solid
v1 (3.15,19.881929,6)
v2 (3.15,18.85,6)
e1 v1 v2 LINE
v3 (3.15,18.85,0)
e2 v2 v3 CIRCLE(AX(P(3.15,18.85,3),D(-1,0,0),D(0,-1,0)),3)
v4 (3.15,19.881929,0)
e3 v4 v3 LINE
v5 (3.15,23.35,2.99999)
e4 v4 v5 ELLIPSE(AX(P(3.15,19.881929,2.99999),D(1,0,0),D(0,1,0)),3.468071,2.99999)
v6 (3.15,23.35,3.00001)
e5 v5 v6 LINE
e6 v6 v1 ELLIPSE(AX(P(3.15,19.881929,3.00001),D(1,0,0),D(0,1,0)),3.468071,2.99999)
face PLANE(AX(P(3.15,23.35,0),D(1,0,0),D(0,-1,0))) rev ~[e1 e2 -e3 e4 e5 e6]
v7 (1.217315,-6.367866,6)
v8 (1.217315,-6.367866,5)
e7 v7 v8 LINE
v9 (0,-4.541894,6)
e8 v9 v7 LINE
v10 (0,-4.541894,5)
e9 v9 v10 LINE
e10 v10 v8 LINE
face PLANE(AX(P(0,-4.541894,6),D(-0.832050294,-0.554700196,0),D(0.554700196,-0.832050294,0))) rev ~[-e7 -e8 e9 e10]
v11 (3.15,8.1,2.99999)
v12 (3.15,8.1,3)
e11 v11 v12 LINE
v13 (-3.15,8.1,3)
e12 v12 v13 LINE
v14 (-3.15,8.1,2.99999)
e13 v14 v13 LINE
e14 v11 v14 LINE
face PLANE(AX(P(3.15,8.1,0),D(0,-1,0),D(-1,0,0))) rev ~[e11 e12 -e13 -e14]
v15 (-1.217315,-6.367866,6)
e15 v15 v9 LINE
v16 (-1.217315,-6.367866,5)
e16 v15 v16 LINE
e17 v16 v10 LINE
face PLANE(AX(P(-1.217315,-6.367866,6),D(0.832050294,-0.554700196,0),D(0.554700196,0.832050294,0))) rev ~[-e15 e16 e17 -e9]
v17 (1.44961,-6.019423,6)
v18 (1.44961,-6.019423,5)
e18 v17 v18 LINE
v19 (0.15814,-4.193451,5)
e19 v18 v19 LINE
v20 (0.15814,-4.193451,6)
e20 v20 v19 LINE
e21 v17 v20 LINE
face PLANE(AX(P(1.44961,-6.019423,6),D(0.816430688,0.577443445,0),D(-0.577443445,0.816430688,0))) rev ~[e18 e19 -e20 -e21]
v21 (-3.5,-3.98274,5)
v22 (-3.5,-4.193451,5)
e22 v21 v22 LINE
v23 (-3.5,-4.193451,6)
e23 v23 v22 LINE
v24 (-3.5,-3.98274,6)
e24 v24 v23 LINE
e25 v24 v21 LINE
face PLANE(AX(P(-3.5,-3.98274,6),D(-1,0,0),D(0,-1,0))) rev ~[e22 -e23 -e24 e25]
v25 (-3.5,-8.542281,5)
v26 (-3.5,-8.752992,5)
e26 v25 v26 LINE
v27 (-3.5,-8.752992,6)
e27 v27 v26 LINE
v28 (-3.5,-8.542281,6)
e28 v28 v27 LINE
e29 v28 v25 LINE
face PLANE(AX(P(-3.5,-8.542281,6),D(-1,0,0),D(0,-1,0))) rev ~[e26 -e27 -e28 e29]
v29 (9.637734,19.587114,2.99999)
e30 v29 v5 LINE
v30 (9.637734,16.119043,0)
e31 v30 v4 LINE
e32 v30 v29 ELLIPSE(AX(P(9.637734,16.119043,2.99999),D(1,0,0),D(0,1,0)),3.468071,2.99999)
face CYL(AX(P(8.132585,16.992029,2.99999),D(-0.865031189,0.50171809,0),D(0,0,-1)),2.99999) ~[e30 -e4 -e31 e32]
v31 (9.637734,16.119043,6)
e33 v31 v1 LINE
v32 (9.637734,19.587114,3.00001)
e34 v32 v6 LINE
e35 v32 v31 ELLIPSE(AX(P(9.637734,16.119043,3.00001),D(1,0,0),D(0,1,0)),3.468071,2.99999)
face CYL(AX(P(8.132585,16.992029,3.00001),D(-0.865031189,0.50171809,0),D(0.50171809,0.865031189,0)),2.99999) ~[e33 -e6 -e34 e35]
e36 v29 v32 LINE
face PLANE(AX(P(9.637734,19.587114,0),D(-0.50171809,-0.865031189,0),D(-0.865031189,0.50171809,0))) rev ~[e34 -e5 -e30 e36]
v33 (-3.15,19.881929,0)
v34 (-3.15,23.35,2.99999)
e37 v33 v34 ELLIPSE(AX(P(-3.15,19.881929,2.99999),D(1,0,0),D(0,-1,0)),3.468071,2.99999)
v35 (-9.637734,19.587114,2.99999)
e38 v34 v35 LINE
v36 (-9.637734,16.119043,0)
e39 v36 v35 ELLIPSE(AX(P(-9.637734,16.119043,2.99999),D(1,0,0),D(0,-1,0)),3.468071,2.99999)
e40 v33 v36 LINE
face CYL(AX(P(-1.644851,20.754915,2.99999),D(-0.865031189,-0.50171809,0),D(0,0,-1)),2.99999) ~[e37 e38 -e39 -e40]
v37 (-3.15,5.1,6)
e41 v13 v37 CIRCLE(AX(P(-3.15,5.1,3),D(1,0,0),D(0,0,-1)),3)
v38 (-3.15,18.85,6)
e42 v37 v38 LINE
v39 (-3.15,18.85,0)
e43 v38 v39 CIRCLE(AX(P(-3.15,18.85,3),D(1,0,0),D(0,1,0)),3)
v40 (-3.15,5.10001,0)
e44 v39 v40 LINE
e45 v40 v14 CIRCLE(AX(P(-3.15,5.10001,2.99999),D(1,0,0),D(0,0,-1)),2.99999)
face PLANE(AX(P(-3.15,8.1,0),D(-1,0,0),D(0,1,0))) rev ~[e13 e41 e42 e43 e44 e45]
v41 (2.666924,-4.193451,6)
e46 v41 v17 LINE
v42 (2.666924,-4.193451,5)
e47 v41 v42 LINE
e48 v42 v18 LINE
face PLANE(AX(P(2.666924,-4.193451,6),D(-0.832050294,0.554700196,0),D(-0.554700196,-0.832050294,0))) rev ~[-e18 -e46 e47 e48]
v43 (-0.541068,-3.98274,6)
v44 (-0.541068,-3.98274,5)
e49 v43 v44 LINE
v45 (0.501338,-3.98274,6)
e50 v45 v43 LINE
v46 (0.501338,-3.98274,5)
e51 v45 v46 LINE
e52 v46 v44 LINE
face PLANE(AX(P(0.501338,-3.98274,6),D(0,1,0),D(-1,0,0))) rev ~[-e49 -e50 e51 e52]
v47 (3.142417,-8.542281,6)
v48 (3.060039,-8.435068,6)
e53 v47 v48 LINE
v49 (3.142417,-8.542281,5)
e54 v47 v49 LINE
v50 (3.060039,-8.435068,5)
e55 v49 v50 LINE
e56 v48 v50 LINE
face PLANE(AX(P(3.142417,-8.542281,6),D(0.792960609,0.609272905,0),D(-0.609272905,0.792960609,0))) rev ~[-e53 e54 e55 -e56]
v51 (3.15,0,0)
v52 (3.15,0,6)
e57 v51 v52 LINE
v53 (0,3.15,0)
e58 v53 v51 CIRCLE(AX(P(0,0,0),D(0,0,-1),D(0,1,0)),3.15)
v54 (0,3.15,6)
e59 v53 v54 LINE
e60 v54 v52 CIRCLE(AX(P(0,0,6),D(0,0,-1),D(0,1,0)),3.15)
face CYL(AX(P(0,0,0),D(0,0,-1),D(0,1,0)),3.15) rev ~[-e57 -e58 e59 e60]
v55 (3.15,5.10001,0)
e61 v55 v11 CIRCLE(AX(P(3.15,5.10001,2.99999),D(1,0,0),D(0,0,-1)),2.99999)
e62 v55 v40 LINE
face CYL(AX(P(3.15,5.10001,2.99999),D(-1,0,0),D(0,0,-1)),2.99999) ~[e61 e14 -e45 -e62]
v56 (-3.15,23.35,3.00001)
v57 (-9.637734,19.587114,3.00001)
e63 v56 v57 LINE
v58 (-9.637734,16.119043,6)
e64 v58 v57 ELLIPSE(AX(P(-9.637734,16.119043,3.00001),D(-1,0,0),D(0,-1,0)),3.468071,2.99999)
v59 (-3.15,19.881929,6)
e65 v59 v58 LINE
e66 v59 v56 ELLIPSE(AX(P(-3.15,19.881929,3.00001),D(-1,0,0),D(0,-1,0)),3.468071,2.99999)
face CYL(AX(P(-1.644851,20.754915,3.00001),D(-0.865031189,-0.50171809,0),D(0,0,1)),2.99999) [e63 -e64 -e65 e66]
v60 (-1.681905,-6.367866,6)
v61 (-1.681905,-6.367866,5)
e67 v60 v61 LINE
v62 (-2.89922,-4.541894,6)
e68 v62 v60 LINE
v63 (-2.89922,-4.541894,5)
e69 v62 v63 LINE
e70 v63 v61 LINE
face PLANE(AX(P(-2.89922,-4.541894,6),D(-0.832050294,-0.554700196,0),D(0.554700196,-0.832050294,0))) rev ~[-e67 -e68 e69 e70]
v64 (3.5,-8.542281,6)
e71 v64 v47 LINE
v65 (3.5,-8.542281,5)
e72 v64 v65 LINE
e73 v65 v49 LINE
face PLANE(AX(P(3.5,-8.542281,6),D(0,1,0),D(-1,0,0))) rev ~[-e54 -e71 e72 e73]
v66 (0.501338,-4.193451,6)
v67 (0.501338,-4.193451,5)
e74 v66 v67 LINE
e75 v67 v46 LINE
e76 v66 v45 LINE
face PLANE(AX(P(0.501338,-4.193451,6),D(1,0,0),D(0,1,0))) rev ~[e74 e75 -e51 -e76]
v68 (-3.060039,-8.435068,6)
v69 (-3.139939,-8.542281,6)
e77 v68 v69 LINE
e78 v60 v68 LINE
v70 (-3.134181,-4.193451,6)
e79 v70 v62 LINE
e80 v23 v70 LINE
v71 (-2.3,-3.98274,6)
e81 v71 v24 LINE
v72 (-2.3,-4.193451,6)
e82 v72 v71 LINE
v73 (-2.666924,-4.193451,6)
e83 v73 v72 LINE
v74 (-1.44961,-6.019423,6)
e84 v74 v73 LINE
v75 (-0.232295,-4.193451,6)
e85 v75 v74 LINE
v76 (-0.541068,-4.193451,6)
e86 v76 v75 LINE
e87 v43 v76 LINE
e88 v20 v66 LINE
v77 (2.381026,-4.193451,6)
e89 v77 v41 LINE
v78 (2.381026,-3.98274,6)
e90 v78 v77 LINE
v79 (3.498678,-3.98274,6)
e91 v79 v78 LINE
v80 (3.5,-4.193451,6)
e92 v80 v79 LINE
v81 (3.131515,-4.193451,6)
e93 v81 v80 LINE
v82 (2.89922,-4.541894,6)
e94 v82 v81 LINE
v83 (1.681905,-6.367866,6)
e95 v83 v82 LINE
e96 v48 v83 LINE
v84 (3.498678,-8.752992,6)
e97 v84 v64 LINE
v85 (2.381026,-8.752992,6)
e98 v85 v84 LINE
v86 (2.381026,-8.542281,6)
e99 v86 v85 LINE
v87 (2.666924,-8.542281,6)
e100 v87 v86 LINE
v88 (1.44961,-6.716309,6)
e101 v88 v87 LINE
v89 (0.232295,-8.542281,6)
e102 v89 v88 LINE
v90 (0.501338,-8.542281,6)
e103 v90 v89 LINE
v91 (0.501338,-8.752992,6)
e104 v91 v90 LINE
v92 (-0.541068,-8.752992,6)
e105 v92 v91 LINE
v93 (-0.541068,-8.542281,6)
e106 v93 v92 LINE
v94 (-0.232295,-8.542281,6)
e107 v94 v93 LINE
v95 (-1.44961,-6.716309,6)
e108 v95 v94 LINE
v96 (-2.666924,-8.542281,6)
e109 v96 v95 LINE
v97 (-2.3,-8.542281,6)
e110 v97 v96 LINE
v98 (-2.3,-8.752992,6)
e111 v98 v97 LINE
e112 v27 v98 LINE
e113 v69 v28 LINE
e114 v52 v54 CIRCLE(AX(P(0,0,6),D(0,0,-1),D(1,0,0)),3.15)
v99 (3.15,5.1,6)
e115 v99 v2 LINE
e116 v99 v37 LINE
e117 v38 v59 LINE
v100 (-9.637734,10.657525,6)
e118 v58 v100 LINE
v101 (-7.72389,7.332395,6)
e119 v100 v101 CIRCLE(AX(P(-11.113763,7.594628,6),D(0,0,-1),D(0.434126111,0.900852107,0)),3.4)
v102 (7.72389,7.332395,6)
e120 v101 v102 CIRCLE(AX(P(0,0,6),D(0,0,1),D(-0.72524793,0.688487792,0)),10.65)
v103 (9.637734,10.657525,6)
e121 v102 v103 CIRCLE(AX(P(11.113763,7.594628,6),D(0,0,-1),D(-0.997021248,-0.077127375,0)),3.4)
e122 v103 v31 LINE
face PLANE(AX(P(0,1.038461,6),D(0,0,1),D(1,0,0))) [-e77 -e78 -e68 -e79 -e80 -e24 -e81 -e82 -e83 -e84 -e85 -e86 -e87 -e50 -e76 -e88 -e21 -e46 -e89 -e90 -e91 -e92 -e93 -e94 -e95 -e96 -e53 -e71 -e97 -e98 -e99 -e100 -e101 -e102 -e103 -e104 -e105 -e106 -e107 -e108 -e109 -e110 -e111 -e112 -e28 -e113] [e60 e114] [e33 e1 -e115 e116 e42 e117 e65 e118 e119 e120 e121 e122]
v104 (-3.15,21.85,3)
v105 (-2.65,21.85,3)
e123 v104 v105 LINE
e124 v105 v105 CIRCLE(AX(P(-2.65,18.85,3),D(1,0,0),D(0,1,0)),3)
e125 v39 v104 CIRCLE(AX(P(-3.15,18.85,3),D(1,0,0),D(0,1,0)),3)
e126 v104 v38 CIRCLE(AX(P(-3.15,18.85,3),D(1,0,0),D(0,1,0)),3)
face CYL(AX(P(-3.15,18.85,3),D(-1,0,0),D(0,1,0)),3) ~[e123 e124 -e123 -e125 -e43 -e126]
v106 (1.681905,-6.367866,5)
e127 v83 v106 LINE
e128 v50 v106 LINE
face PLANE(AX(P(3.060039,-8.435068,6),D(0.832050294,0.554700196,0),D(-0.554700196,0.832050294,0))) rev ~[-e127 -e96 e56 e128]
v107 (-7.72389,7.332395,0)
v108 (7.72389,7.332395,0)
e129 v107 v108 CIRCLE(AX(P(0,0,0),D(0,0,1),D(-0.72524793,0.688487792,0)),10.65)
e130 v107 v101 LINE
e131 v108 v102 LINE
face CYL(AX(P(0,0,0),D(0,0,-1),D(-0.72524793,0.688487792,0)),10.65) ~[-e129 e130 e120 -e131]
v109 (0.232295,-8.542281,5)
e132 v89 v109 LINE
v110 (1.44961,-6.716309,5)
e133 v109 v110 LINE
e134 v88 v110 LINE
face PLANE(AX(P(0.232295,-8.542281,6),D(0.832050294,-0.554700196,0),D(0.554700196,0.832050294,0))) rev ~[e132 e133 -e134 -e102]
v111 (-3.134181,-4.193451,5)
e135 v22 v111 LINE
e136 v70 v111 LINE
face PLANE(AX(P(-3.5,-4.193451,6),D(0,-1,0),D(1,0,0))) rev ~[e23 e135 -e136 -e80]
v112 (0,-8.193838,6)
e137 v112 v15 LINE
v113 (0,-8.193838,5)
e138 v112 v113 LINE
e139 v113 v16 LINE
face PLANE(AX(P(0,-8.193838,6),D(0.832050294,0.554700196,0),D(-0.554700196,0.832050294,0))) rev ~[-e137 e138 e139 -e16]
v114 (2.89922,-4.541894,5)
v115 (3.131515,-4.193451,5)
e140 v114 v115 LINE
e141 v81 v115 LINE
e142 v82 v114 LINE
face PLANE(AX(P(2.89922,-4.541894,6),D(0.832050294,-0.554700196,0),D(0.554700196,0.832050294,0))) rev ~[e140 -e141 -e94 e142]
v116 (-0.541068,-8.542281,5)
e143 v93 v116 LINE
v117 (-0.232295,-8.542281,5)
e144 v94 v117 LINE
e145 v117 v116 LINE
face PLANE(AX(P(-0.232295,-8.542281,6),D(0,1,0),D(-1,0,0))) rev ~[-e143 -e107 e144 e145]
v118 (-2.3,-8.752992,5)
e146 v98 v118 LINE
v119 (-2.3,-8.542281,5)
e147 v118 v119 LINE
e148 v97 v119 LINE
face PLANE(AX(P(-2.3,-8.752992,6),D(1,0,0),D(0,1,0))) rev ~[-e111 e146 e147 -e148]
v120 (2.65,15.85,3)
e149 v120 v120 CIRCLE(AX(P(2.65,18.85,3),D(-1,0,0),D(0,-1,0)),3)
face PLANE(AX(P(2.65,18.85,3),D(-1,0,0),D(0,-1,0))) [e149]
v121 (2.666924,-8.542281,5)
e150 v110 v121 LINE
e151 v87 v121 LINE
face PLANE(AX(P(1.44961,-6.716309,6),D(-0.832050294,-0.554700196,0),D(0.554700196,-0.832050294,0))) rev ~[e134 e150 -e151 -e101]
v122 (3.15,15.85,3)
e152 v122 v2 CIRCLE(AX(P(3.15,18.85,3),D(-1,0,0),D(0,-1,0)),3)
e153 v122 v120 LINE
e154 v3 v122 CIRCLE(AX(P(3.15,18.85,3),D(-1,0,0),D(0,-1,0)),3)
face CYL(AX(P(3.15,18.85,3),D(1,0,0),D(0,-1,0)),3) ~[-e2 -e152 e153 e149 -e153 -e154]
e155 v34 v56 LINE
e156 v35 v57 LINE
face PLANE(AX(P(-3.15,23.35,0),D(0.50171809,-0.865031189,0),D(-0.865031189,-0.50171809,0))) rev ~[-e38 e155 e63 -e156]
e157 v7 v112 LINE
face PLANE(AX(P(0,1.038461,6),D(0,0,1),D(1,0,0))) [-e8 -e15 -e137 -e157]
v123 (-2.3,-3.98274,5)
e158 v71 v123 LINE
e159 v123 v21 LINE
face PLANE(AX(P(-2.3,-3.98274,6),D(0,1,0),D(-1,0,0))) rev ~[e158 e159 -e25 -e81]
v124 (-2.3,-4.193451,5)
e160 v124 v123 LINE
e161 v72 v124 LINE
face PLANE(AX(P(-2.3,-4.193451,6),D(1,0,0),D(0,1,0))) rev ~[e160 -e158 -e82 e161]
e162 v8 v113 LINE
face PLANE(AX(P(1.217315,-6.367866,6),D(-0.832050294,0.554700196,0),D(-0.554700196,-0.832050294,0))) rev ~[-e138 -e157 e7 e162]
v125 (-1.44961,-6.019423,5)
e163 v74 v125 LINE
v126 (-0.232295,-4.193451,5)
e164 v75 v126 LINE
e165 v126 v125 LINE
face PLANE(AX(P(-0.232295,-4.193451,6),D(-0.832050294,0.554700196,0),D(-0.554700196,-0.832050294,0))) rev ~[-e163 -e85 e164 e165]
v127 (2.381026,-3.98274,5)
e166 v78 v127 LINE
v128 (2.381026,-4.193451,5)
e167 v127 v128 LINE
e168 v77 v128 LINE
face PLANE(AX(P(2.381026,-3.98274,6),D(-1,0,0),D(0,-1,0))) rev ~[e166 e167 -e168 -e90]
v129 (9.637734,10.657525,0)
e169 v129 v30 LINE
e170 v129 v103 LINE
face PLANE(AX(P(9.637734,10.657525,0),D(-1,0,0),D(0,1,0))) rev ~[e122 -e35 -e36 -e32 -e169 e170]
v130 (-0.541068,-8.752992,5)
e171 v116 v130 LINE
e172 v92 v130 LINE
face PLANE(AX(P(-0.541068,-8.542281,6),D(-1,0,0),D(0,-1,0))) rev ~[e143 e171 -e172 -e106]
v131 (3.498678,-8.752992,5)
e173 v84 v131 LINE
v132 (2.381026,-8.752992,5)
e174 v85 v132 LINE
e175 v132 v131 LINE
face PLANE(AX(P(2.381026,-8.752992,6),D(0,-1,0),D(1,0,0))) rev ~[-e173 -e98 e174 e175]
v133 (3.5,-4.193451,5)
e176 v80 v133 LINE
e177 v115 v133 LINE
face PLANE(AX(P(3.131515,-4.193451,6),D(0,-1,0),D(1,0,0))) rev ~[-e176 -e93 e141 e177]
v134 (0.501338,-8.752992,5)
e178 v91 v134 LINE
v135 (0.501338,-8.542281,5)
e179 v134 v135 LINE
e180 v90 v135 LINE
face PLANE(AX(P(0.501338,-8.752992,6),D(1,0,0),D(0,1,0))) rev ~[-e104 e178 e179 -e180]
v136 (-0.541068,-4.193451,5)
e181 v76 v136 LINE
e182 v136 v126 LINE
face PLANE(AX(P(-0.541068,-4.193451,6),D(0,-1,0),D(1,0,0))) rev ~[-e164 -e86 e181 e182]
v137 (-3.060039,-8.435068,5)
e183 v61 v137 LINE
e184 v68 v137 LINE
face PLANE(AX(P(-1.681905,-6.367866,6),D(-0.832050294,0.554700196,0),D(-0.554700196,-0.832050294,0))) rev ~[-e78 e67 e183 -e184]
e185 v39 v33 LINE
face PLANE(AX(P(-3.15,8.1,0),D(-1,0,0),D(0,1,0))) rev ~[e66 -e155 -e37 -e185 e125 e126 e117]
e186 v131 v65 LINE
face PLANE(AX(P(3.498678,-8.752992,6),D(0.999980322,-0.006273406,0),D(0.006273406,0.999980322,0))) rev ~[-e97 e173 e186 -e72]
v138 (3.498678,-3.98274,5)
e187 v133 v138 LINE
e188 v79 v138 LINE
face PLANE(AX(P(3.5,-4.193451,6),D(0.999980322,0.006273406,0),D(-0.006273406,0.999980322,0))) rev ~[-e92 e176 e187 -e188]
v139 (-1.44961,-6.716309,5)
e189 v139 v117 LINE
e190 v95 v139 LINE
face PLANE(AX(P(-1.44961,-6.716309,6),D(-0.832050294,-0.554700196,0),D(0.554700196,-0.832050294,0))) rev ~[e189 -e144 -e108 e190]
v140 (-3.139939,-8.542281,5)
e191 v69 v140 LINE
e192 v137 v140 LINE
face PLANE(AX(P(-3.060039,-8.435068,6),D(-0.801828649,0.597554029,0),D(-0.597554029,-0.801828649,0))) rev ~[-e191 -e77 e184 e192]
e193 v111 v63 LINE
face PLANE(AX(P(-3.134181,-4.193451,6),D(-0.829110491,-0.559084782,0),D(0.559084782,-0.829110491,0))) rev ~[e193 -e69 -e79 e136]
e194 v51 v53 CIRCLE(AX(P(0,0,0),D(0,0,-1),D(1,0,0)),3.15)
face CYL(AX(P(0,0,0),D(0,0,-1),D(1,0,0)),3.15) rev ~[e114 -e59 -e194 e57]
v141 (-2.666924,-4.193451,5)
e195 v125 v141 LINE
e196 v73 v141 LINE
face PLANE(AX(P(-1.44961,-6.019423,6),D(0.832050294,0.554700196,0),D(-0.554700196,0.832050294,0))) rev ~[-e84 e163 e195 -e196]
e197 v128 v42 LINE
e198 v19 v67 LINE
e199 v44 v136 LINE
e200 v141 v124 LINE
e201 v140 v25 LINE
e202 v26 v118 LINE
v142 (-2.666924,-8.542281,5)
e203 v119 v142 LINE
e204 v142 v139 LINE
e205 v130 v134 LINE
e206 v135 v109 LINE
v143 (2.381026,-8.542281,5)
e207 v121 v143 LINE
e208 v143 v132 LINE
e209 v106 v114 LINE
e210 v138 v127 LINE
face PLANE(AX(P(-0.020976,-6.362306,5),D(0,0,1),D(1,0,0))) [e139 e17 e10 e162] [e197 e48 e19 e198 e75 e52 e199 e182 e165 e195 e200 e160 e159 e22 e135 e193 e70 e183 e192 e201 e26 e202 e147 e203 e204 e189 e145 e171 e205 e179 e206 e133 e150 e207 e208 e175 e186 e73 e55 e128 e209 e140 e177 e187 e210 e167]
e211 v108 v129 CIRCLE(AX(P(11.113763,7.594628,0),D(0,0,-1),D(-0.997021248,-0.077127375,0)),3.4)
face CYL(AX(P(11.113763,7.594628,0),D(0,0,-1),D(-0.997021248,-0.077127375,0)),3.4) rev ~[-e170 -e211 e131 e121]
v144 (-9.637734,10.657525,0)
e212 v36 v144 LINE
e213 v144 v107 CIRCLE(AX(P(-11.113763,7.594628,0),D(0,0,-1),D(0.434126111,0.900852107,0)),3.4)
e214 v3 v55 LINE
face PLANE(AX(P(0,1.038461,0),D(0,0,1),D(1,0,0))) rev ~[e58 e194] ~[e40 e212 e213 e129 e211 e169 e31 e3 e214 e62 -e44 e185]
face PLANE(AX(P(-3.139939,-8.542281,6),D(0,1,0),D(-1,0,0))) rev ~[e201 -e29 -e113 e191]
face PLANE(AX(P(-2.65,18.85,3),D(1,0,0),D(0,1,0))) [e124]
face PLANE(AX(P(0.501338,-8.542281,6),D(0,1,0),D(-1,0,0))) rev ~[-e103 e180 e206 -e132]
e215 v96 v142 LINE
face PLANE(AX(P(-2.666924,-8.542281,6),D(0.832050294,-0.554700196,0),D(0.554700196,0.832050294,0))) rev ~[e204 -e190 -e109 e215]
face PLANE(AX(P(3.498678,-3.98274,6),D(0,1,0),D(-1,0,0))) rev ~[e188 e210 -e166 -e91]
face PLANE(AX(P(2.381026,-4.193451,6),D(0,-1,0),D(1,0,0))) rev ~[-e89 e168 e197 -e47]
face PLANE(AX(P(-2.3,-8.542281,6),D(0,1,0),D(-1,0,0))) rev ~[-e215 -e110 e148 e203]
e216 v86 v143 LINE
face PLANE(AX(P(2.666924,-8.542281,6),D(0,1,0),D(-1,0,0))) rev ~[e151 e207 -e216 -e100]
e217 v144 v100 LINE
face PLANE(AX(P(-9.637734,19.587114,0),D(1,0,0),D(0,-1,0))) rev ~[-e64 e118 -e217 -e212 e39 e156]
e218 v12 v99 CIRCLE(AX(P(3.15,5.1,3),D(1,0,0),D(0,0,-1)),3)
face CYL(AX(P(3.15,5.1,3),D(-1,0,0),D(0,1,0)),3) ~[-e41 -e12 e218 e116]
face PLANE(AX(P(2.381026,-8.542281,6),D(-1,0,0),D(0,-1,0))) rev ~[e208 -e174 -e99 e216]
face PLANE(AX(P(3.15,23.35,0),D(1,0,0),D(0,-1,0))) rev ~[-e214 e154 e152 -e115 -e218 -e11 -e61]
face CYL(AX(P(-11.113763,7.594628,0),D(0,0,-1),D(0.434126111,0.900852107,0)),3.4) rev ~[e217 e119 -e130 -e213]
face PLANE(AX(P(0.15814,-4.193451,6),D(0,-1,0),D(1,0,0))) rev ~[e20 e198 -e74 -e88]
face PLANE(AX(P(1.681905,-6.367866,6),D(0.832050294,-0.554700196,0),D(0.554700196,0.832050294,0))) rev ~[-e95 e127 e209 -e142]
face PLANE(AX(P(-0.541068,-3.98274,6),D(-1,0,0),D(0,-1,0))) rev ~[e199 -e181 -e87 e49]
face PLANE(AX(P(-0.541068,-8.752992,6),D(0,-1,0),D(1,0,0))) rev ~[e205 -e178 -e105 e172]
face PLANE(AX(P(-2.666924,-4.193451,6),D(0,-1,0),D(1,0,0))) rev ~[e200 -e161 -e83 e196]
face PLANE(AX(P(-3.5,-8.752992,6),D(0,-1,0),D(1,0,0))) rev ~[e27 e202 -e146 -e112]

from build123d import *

# Parameters (mm, degrees)
F1_DEPTH = 6
F2_R     = 3
F3_DEPTH = 0.5
F4_R     = 3
F5_DEPTH = 0.5
F6_R     = 2.99999
F7_R     = 2.99999
F9_DEPTH = 1
F10_R    = 3
F11_R    = 2.99999


# Not quite as in the source:
# - a fillet or chamfer is up to 0.001 mm smaller than in the source, because OpenCascade refuses the exact size


with BuildPart() as f1:
    # F0 (on Top) → F1 (new body)
    with BuildSketch(Plane.XY):
        with BuildLine():
            Line((-3.15, 8.1), (-3.15, 10.1734949747))
            ThreePointArc((-3.15, 10.1734949747), (-5.6194604457, 9.046776459), (-7.7238904562, 7.3323949854))
            ThreePointArc((-7.7238904562, 7.3323949854), (0, -10.65), (7.7238904562, 7.3323949854))
            ThreePointArc((7.7238904562, 7.3323949854), (5.6194604457, 9.046776459), (3.15, 10.1734949747))
            Line((3.15, 10.1734949747), (3.15, 8.1))
            Line((3.15, 8.1), (0, 8.1))
            Line((0, 8.1), (-3.15, 8.1))
        make_face()
        with BuildLine():
            ThreePointArc((3.15, 0), (-2.2273863607, -2.2273863607), (0, 3.15))
            ThreePointArc((0, 3.15), (2.2273863607, 2.2273863607), (3.15, 0))
        make_face(mode=Mode.SUBTRACT)
        with BuildLine():
            ThreePointArc((-7.7238904562, 7.3323949854), (-5.6194604457, 9.046776459), (-3.15, 10.1734949747))
            Line((-3.15, 10.1734949747), (-3.15, 23.35))
            Line((-3.15, 23.35), (-9.6377339195, 19.5871143267))
            Line((-9.6377339195, 19.5871143267), (-9.6377339195, 10.6575252249))
            ThreePointArc((-9.6377339195, 10.6575252249), (-8.1670066914, 9.2906908645), (-7.7238904562, 7.3323949854))
        make_face()
        with BuildLine():
            ThreePointArc((3.15, 10.1734949747), (5.6194604457, 9.046776459), (7.7238904562, 7.3323949854))
            ThreePointArc((7.7238904562, 7.3323949854), (8.1670066914, 9.2906908645), (9.6377339195, 10.6575252249))
            Line((9.6377339195, 10.6575252249), (9.6377339195, 19.5871143267))
            Line((9.6377339195, 19.5871143267), (3.15, 23.35))
            Line((3.15, 23.35), (3.15, 10.1734949747))
        make_face()
    extrude(amount=F1_DEPTH)

    # F2 (on face) → F3 (join)
    with BuildSketch(Plane.YZ.offset(-3.15)):
        with Locations((18.85, 3)):
            Circle(F2_R)
    extrude(amount=F3_DEPTH)

    # F4 (on face) → F5 (join)
    with BuildSketch(Plane(origin=(3.15, 0, 0), x_dir=(0, -1, 0), z_dir=(-1, 0, 0))):
        with Locations((-18.85, 3)):
            Circle(F4_R)
    extrude(amount=F5_DEPTH)

    # F6 (radius 3 in the source; OpenCascade refuses exactly that, so slightly less here)
    f6_edges = [f1.edges().sort_by_distance(p)[0] for p in [
        (-6.393867, 21.468557, 0),
        (-6.393867, 21.468557, 6),
    ]]
    fillet(f6_edges, radius=F6_R)

    # F7 (radius 3 in the source; OpenCascade refuses exactly that, so slightly less here)
    f7_edges = [f1.edges().sort_by_distance(p)[0] for p in [
        (6.393867, 21.468557, 0),
        (6.393867, 21.468557, 6),
    ]]
    fillet(f7_edges, radius=F7_R)

    # F8 (on face) → F9 (cut)
    with BuildSketch(Plane.XY.offset(6)):
        Polygon((-0.5410675658, -4.1934514275), (-0.2322952287, -4.1934514275), (-1.4496098506, -6.0194233604), (-2.6669244725, -4.1934514275), (-2.3, -4.1934514275), (-2.3, -3.9827399887), (-3.5, -3.9827399887), (-3.5, -4.1934514275), (-3.1341812573, -4.1934514275), (-2.8992197012, -4.5418942706), (-1.6819050793, -6.3678662034), (-3.0600394749, -8.4350677969), (-3.1399389263, -8.5422809794), (-3.5, -8.5422809794), (-3.5, -8.7529924182), (-2.3, -8.7529924182), (-2.3, -8.5422809794), (-2.6669244725, -8.5422809794), (-1.4496098506, -6.7163090465), (-0.2322952287, -8.5422809794), (-0.5410675658, -8.5422809794), (-0.5410675658, -8.7529924182), (0.5013382179, -8.7529924182), (0.5013382179, -8.5422809794), (0.2322952287, -8.5422809794), (1.4496098506, -6.7163090465), (2.6669244725, -8.5422809794), (2.3810260464, -8.5422809794), (2.3810260464, -8.7529924182), (3.4986780956, -8.7529924182), (3.5, -8.5422809794), (3.1424169429, -8.5422809794), (3.0600394749, -8.4350677969), (1.6819050793, -6.3678662034), (2.8992197012, -4.5418942706), (3.1315149299, -4.1934514275), (3.3579636365, -4.1934514275), (3.5, -4.1934514275), (3.4986780956, -3.9827399887), (2.3810260464, -3.9827399887), (2.3810260464, -4.1934514275), (2.6669244725, -4.1934514275), (1.4496098506, -6.0194233604), (0.1581401168, -4.1934514275), (0.5013382179, -4.1934514275), (0.5013382179, -3.9827399887), (-0.5410675658, -3.9827399887), align=None)
        Polygon((-1.2173146219, -6.3678662034), (0, -4.5418942706), (1.2173146219, -6.3678662034), (0, -8.1938381363), align=None, mode=Mode.SUBTRACT)
    extrude(amount=-F9_DEPTH, mode=Mode.SUBTRACT)

    # F10
    f10_edges = [f1.edges().sort_by_distance(p)[0] for p in [
        (0, 8.1, 6),
    ]]
    fillet(f10_edges, radius=F10_R)

    # F11 (radius 3 in the source; OpenCascade refuses exactly that, so slightly less here)
    f11_edges = [f1.edges().sort_by_distance(p)[0] for p in [
        (0, 8.1, 0),
    ]]
    fillet(f11_edges, radius=F11_R)


solid = f1.part
